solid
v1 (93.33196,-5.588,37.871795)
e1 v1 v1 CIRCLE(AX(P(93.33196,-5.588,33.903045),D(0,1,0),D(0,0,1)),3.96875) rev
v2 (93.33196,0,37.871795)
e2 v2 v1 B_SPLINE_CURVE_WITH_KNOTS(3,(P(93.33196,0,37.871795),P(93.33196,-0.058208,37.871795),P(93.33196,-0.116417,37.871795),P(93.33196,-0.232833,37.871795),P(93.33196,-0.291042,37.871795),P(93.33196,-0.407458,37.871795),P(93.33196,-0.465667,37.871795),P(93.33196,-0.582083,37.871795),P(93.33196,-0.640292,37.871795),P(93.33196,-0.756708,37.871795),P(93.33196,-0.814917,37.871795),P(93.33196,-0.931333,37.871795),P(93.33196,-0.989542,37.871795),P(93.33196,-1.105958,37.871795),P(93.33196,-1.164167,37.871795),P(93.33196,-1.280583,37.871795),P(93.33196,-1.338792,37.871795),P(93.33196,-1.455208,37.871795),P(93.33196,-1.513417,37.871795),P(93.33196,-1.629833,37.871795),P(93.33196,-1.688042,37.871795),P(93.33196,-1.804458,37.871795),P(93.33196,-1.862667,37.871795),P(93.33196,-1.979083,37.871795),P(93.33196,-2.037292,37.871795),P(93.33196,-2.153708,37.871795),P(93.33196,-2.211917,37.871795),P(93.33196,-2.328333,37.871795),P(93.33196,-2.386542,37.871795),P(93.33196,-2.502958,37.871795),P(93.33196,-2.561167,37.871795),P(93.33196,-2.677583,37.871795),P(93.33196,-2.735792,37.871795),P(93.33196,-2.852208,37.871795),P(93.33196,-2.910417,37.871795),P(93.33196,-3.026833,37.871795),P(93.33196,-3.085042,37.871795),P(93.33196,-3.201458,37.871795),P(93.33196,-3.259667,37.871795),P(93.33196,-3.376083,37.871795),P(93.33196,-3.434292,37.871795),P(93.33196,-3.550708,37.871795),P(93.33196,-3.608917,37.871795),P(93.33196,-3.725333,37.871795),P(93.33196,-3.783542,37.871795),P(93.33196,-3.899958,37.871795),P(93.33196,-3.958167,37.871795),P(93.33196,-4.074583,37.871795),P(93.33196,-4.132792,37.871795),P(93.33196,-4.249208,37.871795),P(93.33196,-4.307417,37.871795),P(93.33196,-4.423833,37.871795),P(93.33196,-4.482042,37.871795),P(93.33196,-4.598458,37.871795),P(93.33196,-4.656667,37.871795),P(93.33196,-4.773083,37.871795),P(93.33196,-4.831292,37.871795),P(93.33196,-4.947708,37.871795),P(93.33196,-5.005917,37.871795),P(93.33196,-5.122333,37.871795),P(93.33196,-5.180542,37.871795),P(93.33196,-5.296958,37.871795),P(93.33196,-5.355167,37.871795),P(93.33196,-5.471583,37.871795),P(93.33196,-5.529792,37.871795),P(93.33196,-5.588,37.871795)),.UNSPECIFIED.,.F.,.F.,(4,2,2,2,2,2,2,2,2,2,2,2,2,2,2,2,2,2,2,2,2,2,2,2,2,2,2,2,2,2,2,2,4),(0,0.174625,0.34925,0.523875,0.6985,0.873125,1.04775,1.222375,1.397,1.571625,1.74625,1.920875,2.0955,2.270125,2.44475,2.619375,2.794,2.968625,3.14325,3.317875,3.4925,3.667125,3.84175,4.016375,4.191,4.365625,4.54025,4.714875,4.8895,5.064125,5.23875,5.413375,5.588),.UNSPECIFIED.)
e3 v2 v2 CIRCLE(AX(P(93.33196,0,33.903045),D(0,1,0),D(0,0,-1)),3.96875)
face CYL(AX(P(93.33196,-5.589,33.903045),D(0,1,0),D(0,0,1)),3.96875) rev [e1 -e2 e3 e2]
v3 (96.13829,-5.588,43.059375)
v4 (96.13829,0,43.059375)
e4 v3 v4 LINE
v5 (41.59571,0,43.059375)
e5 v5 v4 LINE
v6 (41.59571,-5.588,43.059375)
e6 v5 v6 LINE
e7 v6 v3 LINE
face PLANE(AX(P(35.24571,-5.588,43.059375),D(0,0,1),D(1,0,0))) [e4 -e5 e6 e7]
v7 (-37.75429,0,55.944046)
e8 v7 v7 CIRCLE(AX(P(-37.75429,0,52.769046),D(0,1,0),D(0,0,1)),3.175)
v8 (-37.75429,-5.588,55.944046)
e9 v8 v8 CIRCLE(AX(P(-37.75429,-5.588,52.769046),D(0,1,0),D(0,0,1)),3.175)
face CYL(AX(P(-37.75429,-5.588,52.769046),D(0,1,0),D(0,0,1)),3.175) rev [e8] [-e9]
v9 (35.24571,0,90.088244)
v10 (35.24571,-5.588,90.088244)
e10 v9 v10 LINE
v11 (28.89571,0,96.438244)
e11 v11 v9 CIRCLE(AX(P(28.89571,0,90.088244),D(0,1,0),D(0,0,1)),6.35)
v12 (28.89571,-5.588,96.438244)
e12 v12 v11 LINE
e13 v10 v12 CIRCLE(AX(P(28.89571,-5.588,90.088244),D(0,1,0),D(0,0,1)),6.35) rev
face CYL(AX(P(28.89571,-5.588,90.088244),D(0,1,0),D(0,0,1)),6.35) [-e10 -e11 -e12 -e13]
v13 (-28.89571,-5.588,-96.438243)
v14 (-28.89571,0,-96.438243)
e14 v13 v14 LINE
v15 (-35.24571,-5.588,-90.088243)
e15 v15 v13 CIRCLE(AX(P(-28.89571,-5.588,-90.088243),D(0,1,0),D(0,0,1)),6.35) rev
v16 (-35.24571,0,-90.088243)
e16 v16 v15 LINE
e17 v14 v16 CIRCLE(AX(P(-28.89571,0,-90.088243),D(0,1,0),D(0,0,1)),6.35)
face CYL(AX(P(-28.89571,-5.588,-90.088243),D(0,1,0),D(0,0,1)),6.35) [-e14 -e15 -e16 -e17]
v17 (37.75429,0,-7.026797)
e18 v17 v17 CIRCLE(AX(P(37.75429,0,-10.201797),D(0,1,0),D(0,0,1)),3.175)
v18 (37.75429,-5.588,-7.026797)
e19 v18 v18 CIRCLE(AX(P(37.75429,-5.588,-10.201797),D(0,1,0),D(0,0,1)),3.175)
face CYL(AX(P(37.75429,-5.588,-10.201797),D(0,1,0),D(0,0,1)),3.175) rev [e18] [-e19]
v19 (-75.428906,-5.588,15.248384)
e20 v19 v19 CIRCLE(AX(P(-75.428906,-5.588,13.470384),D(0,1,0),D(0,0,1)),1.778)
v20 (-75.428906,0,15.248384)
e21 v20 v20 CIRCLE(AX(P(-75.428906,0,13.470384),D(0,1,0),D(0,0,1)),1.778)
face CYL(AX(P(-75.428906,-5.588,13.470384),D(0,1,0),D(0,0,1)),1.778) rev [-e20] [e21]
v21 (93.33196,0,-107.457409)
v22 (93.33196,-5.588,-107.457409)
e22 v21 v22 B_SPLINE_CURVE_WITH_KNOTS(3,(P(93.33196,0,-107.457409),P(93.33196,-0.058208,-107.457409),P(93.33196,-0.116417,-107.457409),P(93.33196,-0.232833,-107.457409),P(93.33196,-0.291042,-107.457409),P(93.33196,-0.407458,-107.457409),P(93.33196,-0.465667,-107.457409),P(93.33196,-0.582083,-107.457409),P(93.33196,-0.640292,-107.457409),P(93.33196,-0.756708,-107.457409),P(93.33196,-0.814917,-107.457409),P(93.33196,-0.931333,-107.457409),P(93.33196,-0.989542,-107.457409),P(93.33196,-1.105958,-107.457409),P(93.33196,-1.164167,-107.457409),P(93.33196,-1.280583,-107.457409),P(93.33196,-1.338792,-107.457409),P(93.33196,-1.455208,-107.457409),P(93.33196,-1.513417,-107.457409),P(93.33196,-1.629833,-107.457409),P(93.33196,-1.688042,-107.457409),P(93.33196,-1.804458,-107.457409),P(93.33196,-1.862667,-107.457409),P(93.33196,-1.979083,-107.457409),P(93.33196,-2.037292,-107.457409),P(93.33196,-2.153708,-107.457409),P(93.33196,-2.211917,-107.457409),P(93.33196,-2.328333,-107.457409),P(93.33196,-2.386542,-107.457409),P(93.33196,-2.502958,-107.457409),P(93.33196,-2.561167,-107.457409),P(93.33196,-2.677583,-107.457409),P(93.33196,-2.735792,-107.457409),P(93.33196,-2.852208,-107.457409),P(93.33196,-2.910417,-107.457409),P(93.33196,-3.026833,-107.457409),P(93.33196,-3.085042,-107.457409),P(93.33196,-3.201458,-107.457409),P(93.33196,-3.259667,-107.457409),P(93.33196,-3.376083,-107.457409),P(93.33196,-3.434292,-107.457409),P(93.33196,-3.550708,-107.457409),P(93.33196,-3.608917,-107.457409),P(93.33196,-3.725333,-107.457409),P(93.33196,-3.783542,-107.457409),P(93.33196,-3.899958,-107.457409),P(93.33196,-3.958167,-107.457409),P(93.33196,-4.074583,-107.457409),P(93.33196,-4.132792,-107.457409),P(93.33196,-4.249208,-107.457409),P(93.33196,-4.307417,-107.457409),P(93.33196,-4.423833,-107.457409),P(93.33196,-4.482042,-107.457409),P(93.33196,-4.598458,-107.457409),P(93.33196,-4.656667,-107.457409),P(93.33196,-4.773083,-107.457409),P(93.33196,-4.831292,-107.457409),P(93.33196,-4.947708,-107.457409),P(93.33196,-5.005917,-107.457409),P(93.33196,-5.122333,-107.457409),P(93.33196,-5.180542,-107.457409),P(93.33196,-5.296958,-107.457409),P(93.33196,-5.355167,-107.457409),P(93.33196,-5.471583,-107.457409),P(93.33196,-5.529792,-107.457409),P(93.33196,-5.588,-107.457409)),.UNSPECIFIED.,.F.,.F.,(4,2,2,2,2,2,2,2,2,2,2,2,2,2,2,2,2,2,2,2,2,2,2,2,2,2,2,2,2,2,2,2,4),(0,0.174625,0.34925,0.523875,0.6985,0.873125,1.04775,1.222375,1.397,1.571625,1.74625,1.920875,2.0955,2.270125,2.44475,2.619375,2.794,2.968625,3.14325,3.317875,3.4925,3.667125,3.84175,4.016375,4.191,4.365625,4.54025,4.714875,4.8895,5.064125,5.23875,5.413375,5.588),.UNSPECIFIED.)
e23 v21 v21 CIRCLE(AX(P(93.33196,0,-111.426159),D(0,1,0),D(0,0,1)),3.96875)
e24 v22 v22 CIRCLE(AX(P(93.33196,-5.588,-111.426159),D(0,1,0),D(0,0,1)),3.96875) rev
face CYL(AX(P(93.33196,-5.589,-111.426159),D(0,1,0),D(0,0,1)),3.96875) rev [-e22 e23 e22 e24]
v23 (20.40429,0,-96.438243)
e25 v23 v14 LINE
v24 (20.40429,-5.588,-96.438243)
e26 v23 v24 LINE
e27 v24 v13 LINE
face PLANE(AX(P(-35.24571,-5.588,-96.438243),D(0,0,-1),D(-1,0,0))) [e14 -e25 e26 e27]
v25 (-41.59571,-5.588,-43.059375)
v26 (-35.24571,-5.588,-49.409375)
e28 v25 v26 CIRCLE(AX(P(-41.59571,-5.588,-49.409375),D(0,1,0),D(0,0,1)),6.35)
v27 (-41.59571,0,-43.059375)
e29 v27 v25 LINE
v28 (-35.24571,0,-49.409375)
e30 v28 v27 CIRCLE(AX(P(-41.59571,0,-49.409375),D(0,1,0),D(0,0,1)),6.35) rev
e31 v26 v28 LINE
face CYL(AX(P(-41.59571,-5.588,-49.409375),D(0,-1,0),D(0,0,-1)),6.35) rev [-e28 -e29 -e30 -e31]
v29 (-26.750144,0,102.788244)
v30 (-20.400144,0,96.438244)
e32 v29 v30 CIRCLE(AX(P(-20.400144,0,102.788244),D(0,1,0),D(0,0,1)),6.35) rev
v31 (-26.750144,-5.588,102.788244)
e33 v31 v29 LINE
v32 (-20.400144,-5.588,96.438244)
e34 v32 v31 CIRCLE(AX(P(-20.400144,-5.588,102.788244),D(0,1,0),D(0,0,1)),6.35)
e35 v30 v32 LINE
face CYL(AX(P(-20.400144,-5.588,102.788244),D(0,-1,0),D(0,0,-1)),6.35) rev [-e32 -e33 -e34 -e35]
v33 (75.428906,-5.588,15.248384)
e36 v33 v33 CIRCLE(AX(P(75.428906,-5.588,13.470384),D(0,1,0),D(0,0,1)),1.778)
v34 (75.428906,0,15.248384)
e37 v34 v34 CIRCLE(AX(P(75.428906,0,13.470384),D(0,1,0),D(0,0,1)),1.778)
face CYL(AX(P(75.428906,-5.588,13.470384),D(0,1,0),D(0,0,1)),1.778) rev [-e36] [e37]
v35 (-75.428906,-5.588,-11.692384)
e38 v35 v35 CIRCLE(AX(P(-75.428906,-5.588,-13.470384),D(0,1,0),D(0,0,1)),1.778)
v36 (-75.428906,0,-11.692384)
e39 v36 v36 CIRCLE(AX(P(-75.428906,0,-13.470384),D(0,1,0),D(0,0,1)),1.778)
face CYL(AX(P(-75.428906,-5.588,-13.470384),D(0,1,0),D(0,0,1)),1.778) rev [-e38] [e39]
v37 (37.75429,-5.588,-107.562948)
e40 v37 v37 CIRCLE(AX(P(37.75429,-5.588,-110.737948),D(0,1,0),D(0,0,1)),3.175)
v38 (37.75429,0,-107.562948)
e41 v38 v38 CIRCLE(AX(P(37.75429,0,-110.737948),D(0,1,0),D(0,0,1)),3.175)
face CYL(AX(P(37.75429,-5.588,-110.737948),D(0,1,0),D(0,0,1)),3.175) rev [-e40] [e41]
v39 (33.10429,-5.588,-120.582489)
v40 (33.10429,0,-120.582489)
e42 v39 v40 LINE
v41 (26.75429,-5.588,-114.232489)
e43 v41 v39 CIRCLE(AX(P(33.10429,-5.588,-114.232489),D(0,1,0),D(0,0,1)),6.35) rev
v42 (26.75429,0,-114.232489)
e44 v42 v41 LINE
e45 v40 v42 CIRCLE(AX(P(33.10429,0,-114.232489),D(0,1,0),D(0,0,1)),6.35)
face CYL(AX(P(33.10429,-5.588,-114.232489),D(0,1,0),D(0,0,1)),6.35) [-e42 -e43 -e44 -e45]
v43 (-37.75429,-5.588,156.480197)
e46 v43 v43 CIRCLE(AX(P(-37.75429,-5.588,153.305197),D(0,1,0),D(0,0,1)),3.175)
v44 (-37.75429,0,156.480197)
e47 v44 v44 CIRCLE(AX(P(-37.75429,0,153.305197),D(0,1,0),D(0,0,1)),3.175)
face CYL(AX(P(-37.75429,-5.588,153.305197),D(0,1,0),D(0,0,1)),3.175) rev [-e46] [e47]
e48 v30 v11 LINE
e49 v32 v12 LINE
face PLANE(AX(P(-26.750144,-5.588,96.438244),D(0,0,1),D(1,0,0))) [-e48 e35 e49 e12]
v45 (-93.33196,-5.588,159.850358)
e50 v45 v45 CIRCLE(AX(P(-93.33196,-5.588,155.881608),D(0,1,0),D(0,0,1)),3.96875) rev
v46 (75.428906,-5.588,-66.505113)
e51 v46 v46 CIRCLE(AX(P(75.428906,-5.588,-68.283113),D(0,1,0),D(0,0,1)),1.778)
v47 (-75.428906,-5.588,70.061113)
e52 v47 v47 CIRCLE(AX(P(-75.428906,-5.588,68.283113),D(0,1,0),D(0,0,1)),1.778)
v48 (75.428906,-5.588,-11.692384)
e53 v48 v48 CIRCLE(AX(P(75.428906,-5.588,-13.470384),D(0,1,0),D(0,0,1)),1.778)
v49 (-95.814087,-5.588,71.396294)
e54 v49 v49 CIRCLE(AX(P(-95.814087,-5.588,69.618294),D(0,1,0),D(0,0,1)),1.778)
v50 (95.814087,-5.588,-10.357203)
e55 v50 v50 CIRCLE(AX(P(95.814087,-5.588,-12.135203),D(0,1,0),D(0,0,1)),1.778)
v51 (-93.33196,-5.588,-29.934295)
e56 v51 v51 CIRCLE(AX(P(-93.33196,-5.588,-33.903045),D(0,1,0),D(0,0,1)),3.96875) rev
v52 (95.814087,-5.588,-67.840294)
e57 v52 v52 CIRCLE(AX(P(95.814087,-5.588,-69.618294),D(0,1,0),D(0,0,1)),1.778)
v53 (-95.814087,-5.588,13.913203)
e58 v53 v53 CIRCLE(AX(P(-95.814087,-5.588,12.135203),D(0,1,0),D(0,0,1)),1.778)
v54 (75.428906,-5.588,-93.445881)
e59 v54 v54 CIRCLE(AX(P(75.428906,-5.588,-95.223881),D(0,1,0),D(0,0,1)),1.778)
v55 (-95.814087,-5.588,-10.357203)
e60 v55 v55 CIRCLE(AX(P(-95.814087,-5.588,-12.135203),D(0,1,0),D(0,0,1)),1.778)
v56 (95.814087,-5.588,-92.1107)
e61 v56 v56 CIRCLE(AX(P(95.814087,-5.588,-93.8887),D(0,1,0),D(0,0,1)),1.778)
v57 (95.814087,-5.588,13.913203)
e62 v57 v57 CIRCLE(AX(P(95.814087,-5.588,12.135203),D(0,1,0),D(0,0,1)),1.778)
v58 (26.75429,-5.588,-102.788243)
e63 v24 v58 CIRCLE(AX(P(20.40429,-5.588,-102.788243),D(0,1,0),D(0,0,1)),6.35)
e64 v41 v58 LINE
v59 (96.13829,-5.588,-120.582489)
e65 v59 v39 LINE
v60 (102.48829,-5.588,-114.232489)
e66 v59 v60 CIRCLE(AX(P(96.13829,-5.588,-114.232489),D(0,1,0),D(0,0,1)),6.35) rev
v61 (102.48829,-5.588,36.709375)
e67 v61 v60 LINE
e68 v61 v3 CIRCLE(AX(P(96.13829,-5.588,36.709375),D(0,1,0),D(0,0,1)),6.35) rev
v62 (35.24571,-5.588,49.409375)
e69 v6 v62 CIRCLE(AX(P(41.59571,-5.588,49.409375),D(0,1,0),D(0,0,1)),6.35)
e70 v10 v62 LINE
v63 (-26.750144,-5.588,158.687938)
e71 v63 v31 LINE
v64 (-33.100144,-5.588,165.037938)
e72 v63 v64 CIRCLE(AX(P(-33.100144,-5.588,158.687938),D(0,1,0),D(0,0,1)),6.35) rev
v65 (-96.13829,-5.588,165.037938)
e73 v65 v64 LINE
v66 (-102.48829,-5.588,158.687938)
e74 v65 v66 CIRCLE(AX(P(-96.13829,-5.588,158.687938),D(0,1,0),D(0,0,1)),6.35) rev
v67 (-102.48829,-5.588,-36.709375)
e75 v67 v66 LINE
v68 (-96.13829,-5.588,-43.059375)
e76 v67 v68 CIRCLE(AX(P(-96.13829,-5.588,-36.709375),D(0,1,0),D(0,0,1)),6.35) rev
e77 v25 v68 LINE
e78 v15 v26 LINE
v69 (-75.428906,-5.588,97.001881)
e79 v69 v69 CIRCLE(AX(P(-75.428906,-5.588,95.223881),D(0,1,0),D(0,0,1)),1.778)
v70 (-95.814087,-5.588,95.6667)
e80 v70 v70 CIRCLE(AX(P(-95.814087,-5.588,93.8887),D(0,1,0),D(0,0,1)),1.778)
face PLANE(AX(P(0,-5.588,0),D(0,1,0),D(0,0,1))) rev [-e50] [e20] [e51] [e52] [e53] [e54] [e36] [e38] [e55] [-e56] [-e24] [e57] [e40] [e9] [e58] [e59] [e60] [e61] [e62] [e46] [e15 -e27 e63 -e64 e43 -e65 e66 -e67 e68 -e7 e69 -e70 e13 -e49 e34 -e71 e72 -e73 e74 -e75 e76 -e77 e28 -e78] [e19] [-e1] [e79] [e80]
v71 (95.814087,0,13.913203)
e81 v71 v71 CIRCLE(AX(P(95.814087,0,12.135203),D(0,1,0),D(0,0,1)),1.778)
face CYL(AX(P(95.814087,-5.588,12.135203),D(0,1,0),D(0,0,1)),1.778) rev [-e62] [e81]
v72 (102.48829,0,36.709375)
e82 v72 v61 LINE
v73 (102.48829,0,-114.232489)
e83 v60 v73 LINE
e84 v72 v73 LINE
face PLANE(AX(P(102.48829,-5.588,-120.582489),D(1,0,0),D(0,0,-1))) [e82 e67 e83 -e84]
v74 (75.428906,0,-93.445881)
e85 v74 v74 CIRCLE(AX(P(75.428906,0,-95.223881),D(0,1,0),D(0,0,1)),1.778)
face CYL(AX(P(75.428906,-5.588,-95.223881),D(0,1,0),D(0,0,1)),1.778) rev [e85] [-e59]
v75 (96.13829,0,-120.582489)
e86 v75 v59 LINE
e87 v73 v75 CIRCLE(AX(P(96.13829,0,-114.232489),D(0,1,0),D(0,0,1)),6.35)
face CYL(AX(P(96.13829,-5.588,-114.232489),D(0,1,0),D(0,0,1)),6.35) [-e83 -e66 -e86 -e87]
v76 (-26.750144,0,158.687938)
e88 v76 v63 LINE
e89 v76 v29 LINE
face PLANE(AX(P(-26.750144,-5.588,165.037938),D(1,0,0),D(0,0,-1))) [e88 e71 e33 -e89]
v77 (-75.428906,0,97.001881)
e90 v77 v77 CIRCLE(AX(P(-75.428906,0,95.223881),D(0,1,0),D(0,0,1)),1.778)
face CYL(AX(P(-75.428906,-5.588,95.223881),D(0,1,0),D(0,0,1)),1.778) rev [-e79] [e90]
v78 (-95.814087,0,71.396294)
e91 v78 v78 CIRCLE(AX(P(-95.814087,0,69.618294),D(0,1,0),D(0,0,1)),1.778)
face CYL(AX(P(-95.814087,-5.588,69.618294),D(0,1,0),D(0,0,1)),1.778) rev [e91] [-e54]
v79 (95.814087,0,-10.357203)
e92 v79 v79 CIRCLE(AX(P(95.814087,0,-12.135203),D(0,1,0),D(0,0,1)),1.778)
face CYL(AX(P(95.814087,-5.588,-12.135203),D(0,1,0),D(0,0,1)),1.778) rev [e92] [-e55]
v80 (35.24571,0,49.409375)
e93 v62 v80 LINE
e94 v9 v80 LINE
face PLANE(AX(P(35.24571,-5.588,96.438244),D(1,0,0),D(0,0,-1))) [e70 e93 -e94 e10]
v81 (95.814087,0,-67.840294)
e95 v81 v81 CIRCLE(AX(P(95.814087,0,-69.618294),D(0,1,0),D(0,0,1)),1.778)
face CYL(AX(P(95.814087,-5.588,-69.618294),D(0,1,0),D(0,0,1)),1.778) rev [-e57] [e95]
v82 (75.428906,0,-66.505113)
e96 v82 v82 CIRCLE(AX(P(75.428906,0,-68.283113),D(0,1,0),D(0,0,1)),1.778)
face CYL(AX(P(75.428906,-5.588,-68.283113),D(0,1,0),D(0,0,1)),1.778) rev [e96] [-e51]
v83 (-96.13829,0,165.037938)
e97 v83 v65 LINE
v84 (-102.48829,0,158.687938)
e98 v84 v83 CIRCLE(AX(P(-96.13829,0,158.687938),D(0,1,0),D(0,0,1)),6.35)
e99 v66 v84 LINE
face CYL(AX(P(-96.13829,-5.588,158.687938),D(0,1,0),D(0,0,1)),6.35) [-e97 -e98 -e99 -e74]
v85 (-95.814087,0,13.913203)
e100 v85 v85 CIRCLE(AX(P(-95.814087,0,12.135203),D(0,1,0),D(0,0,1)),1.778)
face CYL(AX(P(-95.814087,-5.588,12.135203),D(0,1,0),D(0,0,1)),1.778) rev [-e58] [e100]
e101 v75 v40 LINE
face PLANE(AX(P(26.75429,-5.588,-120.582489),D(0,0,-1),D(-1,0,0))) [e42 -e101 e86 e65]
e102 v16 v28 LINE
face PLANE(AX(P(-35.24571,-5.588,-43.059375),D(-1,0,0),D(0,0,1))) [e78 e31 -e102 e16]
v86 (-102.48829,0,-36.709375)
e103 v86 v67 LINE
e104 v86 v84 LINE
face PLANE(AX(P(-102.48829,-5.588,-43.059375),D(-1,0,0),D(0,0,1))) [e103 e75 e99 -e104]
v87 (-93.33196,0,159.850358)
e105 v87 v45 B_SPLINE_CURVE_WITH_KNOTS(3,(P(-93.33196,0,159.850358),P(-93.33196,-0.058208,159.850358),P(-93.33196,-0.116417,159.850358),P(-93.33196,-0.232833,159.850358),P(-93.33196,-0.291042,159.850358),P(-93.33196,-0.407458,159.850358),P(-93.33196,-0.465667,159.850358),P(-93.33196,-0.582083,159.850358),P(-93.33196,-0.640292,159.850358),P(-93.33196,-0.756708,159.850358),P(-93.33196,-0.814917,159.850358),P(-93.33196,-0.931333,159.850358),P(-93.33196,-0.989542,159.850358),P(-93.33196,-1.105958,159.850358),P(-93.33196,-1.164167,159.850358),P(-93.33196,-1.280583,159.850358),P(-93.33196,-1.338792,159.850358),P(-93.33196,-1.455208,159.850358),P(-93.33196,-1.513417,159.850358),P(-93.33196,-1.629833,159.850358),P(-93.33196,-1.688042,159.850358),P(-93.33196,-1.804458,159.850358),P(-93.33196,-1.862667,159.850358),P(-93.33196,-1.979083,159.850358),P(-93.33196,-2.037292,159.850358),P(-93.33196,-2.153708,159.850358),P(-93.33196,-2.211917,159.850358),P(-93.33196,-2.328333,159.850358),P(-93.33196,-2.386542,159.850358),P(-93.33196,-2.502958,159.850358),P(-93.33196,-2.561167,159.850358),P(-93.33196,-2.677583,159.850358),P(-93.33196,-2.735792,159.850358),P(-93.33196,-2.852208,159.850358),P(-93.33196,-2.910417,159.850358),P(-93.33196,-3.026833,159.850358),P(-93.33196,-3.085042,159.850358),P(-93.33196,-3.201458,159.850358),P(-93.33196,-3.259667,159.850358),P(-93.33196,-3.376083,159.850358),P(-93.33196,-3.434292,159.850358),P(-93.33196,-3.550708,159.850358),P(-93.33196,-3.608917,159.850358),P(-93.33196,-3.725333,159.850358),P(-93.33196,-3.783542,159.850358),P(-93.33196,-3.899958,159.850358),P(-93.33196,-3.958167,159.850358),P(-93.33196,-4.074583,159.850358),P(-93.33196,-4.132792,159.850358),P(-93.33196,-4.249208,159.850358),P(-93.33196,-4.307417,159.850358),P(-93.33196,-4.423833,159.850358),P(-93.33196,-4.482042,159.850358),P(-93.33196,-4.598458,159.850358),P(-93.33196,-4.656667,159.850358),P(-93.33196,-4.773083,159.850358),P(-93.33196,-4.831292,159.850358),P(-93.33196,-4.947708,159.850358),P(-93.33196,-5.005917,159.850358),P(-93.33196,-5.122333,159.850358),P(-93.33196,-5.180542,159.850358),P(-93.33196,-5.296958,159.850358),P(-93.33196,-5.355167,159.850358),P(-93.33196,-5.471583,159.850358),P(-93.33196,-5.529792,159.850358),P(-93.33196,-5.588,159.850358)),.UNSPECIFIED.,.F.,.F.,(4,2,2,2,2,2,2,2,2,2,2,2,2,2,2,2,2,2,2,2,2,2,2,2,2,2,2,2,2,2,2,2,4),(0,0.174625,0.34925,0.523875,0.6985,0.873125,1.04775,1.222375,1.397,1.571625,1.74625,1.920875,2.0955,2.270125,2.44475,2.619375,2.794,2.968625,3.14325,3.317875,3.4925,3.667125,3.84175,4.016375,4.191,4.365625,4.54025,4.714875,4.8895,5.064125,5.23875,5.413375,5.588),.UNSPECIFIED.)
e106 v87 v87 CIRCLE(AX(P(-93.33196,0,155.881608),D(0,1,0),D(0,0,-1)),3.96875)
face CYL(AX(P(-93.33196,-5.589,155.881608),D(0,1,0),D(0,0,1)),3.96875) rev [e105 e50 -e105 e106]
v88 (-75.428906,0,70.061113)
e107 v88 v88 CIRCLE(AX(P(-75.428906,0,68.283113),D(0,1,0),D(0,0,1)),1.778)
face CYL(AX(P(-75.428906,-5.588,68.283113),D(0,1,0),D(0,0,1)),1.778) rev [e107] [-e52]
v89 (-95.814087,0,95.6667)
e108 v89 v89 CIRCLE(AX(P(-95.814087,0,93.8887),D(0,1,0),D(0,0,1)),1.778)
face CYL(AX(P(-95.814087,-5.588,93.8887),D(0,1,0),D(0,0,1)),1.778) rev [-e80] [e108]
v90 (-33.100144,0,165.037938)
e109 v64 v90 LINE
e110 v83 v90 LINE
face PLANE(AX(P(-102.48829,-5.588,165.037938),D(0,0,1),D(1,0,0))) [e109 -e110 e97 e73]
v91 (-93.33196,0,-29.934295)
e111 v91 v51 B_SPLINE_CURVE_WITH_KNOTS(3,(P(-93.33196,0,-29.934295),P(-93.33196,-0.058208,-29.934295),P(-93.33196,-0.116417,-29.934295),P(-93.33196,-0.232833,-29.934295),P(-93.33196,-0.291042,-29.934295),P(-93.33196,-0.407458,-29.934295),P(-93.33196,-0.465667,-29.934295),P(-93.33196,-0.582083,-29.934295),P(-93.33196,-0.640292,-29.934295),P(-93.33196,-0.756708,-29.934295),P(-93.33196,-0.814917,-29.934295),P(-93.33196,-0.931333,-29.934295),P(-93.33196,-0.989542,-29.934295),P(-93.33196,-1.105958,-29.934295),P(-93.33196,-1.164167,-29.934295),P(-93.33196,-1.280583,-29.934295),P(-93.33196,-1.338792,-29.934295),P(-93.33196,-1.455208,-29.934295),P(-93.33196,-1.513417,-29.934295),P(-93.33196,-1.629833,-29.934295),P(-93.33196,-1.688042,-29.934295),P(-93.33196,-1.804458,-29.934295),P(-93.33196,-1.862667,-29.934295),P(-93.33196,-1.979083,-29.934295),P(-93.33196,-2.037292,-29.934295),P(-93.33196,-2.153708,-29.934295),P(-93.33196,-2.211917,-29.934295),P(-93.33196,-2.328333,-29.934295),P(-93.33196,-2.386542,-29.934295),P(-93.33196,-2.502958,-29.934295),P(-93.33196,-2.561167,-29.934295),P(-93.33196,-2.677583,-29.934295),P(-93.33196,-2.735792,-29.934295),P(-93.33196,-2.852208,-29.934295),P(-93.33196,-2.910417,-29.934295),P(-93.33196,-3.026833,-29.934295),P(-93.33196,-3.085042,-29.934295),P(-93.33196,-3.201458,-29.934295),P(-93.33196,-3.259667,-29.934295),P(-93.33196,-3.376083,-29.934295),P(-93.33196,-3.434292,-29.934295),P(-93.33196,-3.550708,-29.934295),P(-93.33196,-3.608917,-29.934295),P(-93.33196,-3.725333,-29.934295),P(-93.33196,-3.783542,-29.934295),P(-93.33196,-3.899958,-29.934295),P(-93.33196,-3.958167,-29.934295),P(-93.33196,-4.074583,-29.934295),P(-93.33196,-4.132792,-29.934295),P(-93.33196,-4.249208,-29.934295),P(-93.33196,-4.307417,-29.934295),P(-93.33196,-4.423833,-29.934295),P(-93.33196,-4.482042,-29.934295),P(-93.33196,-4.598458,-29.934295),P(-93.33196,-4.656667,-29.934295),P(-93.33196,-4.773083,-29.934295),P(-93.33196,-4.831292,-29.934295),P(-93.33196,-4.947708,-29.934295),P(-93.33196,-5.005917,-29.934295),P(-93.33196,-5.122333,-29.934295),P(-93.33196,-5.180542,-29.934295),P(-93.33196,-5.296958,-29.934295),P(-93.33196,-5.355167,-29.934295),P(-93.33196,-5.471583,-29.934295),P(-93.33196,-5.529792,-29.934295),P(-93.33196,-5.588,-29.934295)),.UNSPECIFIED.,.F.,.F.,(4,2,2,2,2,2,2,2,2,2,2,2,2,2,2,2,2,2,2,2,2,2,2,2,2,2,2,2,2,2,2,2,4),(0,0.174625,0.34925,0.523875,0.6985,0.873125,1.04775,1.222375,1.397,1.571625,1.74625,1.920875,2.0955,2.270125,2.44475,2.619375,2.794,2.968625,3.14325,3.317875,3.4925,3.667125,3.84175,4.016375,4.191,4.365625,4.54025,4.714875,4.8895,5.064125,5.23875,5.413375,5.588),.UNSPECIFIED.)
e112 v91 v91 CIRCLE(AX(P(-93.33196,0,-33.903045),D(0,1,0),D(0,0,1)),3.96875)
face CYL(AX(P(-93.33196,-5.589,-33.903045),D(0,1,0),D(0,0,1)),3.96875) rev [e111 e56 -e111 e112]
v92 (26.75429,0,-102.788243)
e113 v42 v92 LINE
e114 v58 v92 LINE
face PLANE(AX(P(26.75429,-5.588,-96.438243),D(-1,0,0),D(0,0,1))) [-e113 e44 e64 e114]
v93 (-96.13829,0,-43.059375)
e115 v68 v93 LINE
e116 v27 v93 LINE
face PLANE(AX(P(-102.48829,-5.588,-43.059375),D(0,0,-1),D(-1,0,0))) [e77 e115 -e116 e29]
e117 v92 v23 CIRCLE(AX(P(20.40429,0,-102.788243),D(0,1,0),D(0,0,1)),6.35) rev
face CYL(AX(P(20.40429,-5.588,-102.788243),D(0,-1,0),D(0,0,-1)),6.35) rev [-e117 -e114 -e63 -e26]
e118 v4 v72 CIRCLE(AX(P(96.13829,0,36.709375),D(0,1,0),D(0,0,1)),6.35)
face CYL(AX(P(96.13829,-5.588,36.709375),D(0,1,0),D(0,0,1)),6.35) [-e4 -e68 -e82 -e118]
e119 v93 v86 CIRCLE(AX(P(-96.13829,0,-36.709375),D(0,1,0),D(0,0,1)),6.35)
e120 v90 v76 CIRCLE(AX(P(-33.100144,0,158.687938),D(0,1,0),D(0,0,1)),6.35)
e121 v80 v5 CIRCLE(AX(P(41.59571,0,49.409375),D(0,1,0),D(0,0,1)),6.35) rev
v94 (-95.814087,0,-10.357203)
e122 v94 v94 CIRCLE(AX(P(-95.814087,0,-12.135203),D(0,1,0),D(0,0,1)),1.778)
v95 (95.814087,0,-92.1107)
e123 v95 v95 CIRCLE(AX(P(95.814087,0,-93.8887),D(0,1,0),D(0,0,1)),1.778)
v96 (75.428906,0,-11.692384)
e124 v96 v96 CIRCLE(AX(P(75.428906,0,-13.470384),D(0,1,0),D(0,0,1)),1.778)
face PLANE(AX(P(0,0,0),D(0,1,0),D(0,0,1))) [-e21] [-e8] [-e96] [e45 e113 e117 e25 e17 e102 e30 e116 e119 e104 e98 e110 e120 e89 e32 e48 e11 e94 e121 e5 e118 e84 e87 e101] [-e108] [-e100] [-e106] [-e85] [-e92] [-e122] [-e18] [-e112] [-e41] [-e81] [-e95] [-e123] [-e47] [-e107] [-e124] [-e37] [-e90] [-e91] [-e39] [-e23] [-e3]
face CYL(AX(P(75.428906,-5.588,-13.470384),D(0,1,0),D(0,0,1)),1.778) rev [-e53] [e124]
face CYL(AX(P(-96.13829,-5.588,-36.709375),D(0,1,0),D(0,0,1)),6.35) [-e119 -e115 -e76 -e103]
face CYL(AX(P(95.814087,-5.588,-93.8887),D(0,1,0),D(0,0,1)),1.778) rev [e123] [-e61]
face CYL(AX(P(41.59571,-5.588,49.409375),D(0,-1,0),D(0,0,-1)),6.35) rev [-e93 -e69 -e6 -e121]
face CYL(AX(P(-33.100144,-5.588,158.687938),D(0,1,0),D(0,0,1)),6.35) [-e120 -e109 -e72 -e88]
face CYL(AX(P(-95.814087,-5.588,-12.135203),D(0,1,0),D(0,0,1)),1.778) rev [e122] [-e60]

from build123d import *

# Parameters (mm, degrees)
SKETCH1_R          = 3.175
SKETCH1_R_2        = 1.778
BASE_FLANGE1_DEPTH = 5.588
FILLET1_R          = 6.35
CUT_EXTRUDE2_REACH = 196.352
SKETCH3_R          = 3.96875


# Sheet-metal steps are written as plain solids
with BuildPart() as part:
    # Sketch1 → Base-Flange1 (new body)
    with BuildSketch(Plane(origin=(0, 0, 0), x_dir=(1, 0, 0), z_dir=(0, 1, 0))):
        Polygon((-102.488290128, 43.05937504), (-102.488290128, -165.037938429), (-26.750144364, -165.037938429), (-26.750144364, -96.438243977), (35.245709983, -96.438243977), (35.245709983, -43.059375352), (102.488290128, -43.059375352), (102.488290128, 120.582488744), (26.754290128, 120.582488744), (26.754290128, 96.438243353), (-35.245709872, 96.438243353), (-35.245709872, 43.05937504), align=None)
        with Locations(Location((-37.754290017, -153.305196741, 0), (0, 0, 270))):
            Circle(SKETCH1_R, mode=Mode.SUBTRACT)
        with Locations(Location((-37.754290017, -52.76904616, 0), (0, 0, 270))):
            Circle(SKETCH1_R, mode=Mode.SUBTRACT)
        with Locations(Location((37.754290128, 10.201797316, 0), (0, 0, 270))):
            Circle(SKETCH1_R, mode=Mode.SUBTRACT)
        with Locations(Location((37.754290128, 110.737947896, 0), (0, 0, 270))):
            Circle(SKETCH1_R, mode=Mode.SUBTRACT)
        with Locations(Location((95.814087341, 93.888699503, 0), (0, 0, 270))):
            Circle(SKETCH1_R_2, mode=Mode.SUBTRACT)
        with Locations(Location((75.428905946, 95.223880898, 0), (0, 0, 270))):
            Circle(SKETCH1_R_2, mode=Mode.SUBTRACT)
        with Locations(Location((75.428905946, 68.283112535, 0), (0, 0, 270))):
            Circle(SKETCH1_R_2, mode=Mode.SUBTRACT)
        with Locations(Location((95.814087341, 69.61829393, 0), (0, 0, 270))):
            Circle(SKETCH1_R_2, mode=Mode.SUBTRACT)
        with Locations(Location((95.814087341, 12.135202787, 0), (0, 0, 270))):
            Circle(SKETCH1_R_2, mode=Mode.SUBTRACT)
        with Locations(Location((95.814087341, -12.135202787, 0), (0, 0, 270))):
            Circle(SKETCH1_R_2, mode=Mode.SUBTRACT)
        with Locations(Location((75.428905946, 13.470384182, 0), (0, 0, 270))):
            Circle(SKETCH1_R_2, mode=Mode.SUBTRACT)
        with Locations(Location((75.428905946, -13.470384182, 0), (0, 0, 270))):
            Circle(SKETCH1_R_2, mode=Mode.SUBTRACT)
        with Locations(Location((-95.814087341, 12.135202787, 0), (0, 0, 270))):
            Circle(SKETCH1_R_2, mode=Mode.SUBTRACT)
        with Locations(Location((-75.428905946, 13.470384182, 0), (0, 0, 270))):
            Circle(SKETCH1_R_2, mode=Mode.SUBTRACT)
        with Locations(Location((-75.428905946, -13.470384182, 0), (0, 0, 270))):
            Circle(SKETCH1_R_2, mode=Mode.SUBTRACT)
        with Locations(Location((-95.814087341, -12.135202787, 0), (0, 0, 270))):
            Circle(SKETCH1_R_2, mode=Mode.SUBTRACT)
        with Locations(Location((-95.814087341, -69.61829393, 0), (0, 0, 270))):
            Circle(SKETCH1_R_2, mode=Mode.SUBTRACT)
        with Locations(Location((-75.428905946, -68.283112535, 0), (0, 0, 270))):
            Circle(SKETCH1_R_2, mode=Mode.SUBTRACT)
        with Locations(Location((-75.428905946, -95.223880898, 0), (0, 0, 270))):
            Circle(SKETCH1_R_2, mode=Mode.SUBTRACT)
        with Locations(Location((-95.814087341, -93.888699503, 0), (0, 0, 270))):
            Circle(SKETCH1_R_2, mode=Mode.SUBTRACT)
    extrude(amount=-BASE_FLANGE1_DEPTH)

    # Fillet1
    fillet1_edges = [part.edges().sort_by_distance(p)[0] for p in [
        (-35.245709872, -2.794, -43.05937504),
        (-35.245709872, -2.794, -96.438243353),
        (26.754290128, -2.794, -96.438243353),
        (26.754290128, -2.794, -120.582488744),
        (102.488290128, -2.794, -120.582488744),
        (102.488290128, -2.794, 43.059375352),
        (35.245709983, -2.794, 43.059375352),
        (35.245709983, -2.794, 96.438243977),
        (-26.750144364, -2.794, 96.438243977),
        (-26.750144364, -2.794, 165.037938429),
        (-102.488290128, -2.794, 165.037938429),
        (-102.488290128, -2.794, -43.05937504),
    ]]
    fillet(fillet1_edges, radius=FILLET1_R)

    # Sketch3 → Cut-Extrude2 (cut, up to next)
    with BuildSketch(Plane(origin=(0, 0, 0), x_dir=(1, 0, 0), z_dir=(0, 1, 0)), mode=Mode.PRIVATE) as cut_extrude2_sk1:
        with Locations(Location((-93.33196009, 33.903045002, 0), (0, 0, 270))):
            Circle(SKETCH3_R)
    cut_extrude2_tool1 = extrude(cut_extrude2_sk1.sketch, amount=-CUT_EXTRUDE2_REACH, mode=Mode.PRIVATE) & part.part
    # Sketch3 → Cut-Extrude2 (cut, up to next)
    with BuildSketch(Plane(origin=(0, 0, 0), x_dir=(1, 0, 0), z_dir=(0, 1, 0)), mode=Mode.PRIVATE) as cut_extrude2_sk2:
        with Locations(Location((-93.33196009, -155.881608392, 0), (0, 0, 270))):
            Circle(SKETCH3_R)
    cut_extrude2_tool2 = extrude(cut_extrude2_sk2.sketch, amount=-CUT_EXTRUDE2_REACH, mode=Mode.PRIVATE) & part.part
    # Sketch3 → Cut-Extrude2 (cut, up to next)
    with BuildSketch(Plane(origin=(0, 0, 0), x_dir=(1, 0, 0), z_dir=(0, 1, 0)), mode=Mode.PRIVATE) as cut_extrude2_sk3:
        with Locations(Location((93.33196009, 111.426158707, 0), (0, 0, 270))):
            Circle(SKETCH3_R)
    cut_extrude2_tool3 = extrude(cut_extrude2_sk3.sketch, amount=-CUT_EXTRUDE2_REACH, mode=Mode.PRIVATE) & part.part
    # Sketch3 → Cut-Extrude2 (cut, up to next)
    with BuildSketch(Plane(origin=(0, 0, 0), x_dir=(1, 0, 0), z_dir=(0, 1, 0)), mode=Mode.PRIVATE) as cut_extrude2_sk4:
        with Locations(Location((93.33196009, -33.903045314, 0), (0, 0, 270))):
            Circle(SKETCH3_R)
    cut_extrude2_tool4 = extrude(cut_extrude2_sk4.sketch, amount=-CUT_EXTRUDE2_REACH, mode=Mode.PRIVATE) & part.part
    add(cut_extrude2_tool1.solids().sort_by_distance((-93.33196, 0, -33.903045))[0], mode=Mode.SUBTRACT)
    add(cut_extrude2_tool2.solids().sort_by_distance((-93.33196, 0, 155.881608))[0], mode=Mode.SUBTRACT)
    add(cut_extrude2_tool3.solids().sort_by_distance((93.33196, 0, -111.426159))[0], mode=Mode.SUBTRACT)
    add(cut_extrude2_tool4.solids().sort_by_distance((93.33196, 0, 33.903045))[0], mode=Mode.SUBTRACT)


solid = part.part
